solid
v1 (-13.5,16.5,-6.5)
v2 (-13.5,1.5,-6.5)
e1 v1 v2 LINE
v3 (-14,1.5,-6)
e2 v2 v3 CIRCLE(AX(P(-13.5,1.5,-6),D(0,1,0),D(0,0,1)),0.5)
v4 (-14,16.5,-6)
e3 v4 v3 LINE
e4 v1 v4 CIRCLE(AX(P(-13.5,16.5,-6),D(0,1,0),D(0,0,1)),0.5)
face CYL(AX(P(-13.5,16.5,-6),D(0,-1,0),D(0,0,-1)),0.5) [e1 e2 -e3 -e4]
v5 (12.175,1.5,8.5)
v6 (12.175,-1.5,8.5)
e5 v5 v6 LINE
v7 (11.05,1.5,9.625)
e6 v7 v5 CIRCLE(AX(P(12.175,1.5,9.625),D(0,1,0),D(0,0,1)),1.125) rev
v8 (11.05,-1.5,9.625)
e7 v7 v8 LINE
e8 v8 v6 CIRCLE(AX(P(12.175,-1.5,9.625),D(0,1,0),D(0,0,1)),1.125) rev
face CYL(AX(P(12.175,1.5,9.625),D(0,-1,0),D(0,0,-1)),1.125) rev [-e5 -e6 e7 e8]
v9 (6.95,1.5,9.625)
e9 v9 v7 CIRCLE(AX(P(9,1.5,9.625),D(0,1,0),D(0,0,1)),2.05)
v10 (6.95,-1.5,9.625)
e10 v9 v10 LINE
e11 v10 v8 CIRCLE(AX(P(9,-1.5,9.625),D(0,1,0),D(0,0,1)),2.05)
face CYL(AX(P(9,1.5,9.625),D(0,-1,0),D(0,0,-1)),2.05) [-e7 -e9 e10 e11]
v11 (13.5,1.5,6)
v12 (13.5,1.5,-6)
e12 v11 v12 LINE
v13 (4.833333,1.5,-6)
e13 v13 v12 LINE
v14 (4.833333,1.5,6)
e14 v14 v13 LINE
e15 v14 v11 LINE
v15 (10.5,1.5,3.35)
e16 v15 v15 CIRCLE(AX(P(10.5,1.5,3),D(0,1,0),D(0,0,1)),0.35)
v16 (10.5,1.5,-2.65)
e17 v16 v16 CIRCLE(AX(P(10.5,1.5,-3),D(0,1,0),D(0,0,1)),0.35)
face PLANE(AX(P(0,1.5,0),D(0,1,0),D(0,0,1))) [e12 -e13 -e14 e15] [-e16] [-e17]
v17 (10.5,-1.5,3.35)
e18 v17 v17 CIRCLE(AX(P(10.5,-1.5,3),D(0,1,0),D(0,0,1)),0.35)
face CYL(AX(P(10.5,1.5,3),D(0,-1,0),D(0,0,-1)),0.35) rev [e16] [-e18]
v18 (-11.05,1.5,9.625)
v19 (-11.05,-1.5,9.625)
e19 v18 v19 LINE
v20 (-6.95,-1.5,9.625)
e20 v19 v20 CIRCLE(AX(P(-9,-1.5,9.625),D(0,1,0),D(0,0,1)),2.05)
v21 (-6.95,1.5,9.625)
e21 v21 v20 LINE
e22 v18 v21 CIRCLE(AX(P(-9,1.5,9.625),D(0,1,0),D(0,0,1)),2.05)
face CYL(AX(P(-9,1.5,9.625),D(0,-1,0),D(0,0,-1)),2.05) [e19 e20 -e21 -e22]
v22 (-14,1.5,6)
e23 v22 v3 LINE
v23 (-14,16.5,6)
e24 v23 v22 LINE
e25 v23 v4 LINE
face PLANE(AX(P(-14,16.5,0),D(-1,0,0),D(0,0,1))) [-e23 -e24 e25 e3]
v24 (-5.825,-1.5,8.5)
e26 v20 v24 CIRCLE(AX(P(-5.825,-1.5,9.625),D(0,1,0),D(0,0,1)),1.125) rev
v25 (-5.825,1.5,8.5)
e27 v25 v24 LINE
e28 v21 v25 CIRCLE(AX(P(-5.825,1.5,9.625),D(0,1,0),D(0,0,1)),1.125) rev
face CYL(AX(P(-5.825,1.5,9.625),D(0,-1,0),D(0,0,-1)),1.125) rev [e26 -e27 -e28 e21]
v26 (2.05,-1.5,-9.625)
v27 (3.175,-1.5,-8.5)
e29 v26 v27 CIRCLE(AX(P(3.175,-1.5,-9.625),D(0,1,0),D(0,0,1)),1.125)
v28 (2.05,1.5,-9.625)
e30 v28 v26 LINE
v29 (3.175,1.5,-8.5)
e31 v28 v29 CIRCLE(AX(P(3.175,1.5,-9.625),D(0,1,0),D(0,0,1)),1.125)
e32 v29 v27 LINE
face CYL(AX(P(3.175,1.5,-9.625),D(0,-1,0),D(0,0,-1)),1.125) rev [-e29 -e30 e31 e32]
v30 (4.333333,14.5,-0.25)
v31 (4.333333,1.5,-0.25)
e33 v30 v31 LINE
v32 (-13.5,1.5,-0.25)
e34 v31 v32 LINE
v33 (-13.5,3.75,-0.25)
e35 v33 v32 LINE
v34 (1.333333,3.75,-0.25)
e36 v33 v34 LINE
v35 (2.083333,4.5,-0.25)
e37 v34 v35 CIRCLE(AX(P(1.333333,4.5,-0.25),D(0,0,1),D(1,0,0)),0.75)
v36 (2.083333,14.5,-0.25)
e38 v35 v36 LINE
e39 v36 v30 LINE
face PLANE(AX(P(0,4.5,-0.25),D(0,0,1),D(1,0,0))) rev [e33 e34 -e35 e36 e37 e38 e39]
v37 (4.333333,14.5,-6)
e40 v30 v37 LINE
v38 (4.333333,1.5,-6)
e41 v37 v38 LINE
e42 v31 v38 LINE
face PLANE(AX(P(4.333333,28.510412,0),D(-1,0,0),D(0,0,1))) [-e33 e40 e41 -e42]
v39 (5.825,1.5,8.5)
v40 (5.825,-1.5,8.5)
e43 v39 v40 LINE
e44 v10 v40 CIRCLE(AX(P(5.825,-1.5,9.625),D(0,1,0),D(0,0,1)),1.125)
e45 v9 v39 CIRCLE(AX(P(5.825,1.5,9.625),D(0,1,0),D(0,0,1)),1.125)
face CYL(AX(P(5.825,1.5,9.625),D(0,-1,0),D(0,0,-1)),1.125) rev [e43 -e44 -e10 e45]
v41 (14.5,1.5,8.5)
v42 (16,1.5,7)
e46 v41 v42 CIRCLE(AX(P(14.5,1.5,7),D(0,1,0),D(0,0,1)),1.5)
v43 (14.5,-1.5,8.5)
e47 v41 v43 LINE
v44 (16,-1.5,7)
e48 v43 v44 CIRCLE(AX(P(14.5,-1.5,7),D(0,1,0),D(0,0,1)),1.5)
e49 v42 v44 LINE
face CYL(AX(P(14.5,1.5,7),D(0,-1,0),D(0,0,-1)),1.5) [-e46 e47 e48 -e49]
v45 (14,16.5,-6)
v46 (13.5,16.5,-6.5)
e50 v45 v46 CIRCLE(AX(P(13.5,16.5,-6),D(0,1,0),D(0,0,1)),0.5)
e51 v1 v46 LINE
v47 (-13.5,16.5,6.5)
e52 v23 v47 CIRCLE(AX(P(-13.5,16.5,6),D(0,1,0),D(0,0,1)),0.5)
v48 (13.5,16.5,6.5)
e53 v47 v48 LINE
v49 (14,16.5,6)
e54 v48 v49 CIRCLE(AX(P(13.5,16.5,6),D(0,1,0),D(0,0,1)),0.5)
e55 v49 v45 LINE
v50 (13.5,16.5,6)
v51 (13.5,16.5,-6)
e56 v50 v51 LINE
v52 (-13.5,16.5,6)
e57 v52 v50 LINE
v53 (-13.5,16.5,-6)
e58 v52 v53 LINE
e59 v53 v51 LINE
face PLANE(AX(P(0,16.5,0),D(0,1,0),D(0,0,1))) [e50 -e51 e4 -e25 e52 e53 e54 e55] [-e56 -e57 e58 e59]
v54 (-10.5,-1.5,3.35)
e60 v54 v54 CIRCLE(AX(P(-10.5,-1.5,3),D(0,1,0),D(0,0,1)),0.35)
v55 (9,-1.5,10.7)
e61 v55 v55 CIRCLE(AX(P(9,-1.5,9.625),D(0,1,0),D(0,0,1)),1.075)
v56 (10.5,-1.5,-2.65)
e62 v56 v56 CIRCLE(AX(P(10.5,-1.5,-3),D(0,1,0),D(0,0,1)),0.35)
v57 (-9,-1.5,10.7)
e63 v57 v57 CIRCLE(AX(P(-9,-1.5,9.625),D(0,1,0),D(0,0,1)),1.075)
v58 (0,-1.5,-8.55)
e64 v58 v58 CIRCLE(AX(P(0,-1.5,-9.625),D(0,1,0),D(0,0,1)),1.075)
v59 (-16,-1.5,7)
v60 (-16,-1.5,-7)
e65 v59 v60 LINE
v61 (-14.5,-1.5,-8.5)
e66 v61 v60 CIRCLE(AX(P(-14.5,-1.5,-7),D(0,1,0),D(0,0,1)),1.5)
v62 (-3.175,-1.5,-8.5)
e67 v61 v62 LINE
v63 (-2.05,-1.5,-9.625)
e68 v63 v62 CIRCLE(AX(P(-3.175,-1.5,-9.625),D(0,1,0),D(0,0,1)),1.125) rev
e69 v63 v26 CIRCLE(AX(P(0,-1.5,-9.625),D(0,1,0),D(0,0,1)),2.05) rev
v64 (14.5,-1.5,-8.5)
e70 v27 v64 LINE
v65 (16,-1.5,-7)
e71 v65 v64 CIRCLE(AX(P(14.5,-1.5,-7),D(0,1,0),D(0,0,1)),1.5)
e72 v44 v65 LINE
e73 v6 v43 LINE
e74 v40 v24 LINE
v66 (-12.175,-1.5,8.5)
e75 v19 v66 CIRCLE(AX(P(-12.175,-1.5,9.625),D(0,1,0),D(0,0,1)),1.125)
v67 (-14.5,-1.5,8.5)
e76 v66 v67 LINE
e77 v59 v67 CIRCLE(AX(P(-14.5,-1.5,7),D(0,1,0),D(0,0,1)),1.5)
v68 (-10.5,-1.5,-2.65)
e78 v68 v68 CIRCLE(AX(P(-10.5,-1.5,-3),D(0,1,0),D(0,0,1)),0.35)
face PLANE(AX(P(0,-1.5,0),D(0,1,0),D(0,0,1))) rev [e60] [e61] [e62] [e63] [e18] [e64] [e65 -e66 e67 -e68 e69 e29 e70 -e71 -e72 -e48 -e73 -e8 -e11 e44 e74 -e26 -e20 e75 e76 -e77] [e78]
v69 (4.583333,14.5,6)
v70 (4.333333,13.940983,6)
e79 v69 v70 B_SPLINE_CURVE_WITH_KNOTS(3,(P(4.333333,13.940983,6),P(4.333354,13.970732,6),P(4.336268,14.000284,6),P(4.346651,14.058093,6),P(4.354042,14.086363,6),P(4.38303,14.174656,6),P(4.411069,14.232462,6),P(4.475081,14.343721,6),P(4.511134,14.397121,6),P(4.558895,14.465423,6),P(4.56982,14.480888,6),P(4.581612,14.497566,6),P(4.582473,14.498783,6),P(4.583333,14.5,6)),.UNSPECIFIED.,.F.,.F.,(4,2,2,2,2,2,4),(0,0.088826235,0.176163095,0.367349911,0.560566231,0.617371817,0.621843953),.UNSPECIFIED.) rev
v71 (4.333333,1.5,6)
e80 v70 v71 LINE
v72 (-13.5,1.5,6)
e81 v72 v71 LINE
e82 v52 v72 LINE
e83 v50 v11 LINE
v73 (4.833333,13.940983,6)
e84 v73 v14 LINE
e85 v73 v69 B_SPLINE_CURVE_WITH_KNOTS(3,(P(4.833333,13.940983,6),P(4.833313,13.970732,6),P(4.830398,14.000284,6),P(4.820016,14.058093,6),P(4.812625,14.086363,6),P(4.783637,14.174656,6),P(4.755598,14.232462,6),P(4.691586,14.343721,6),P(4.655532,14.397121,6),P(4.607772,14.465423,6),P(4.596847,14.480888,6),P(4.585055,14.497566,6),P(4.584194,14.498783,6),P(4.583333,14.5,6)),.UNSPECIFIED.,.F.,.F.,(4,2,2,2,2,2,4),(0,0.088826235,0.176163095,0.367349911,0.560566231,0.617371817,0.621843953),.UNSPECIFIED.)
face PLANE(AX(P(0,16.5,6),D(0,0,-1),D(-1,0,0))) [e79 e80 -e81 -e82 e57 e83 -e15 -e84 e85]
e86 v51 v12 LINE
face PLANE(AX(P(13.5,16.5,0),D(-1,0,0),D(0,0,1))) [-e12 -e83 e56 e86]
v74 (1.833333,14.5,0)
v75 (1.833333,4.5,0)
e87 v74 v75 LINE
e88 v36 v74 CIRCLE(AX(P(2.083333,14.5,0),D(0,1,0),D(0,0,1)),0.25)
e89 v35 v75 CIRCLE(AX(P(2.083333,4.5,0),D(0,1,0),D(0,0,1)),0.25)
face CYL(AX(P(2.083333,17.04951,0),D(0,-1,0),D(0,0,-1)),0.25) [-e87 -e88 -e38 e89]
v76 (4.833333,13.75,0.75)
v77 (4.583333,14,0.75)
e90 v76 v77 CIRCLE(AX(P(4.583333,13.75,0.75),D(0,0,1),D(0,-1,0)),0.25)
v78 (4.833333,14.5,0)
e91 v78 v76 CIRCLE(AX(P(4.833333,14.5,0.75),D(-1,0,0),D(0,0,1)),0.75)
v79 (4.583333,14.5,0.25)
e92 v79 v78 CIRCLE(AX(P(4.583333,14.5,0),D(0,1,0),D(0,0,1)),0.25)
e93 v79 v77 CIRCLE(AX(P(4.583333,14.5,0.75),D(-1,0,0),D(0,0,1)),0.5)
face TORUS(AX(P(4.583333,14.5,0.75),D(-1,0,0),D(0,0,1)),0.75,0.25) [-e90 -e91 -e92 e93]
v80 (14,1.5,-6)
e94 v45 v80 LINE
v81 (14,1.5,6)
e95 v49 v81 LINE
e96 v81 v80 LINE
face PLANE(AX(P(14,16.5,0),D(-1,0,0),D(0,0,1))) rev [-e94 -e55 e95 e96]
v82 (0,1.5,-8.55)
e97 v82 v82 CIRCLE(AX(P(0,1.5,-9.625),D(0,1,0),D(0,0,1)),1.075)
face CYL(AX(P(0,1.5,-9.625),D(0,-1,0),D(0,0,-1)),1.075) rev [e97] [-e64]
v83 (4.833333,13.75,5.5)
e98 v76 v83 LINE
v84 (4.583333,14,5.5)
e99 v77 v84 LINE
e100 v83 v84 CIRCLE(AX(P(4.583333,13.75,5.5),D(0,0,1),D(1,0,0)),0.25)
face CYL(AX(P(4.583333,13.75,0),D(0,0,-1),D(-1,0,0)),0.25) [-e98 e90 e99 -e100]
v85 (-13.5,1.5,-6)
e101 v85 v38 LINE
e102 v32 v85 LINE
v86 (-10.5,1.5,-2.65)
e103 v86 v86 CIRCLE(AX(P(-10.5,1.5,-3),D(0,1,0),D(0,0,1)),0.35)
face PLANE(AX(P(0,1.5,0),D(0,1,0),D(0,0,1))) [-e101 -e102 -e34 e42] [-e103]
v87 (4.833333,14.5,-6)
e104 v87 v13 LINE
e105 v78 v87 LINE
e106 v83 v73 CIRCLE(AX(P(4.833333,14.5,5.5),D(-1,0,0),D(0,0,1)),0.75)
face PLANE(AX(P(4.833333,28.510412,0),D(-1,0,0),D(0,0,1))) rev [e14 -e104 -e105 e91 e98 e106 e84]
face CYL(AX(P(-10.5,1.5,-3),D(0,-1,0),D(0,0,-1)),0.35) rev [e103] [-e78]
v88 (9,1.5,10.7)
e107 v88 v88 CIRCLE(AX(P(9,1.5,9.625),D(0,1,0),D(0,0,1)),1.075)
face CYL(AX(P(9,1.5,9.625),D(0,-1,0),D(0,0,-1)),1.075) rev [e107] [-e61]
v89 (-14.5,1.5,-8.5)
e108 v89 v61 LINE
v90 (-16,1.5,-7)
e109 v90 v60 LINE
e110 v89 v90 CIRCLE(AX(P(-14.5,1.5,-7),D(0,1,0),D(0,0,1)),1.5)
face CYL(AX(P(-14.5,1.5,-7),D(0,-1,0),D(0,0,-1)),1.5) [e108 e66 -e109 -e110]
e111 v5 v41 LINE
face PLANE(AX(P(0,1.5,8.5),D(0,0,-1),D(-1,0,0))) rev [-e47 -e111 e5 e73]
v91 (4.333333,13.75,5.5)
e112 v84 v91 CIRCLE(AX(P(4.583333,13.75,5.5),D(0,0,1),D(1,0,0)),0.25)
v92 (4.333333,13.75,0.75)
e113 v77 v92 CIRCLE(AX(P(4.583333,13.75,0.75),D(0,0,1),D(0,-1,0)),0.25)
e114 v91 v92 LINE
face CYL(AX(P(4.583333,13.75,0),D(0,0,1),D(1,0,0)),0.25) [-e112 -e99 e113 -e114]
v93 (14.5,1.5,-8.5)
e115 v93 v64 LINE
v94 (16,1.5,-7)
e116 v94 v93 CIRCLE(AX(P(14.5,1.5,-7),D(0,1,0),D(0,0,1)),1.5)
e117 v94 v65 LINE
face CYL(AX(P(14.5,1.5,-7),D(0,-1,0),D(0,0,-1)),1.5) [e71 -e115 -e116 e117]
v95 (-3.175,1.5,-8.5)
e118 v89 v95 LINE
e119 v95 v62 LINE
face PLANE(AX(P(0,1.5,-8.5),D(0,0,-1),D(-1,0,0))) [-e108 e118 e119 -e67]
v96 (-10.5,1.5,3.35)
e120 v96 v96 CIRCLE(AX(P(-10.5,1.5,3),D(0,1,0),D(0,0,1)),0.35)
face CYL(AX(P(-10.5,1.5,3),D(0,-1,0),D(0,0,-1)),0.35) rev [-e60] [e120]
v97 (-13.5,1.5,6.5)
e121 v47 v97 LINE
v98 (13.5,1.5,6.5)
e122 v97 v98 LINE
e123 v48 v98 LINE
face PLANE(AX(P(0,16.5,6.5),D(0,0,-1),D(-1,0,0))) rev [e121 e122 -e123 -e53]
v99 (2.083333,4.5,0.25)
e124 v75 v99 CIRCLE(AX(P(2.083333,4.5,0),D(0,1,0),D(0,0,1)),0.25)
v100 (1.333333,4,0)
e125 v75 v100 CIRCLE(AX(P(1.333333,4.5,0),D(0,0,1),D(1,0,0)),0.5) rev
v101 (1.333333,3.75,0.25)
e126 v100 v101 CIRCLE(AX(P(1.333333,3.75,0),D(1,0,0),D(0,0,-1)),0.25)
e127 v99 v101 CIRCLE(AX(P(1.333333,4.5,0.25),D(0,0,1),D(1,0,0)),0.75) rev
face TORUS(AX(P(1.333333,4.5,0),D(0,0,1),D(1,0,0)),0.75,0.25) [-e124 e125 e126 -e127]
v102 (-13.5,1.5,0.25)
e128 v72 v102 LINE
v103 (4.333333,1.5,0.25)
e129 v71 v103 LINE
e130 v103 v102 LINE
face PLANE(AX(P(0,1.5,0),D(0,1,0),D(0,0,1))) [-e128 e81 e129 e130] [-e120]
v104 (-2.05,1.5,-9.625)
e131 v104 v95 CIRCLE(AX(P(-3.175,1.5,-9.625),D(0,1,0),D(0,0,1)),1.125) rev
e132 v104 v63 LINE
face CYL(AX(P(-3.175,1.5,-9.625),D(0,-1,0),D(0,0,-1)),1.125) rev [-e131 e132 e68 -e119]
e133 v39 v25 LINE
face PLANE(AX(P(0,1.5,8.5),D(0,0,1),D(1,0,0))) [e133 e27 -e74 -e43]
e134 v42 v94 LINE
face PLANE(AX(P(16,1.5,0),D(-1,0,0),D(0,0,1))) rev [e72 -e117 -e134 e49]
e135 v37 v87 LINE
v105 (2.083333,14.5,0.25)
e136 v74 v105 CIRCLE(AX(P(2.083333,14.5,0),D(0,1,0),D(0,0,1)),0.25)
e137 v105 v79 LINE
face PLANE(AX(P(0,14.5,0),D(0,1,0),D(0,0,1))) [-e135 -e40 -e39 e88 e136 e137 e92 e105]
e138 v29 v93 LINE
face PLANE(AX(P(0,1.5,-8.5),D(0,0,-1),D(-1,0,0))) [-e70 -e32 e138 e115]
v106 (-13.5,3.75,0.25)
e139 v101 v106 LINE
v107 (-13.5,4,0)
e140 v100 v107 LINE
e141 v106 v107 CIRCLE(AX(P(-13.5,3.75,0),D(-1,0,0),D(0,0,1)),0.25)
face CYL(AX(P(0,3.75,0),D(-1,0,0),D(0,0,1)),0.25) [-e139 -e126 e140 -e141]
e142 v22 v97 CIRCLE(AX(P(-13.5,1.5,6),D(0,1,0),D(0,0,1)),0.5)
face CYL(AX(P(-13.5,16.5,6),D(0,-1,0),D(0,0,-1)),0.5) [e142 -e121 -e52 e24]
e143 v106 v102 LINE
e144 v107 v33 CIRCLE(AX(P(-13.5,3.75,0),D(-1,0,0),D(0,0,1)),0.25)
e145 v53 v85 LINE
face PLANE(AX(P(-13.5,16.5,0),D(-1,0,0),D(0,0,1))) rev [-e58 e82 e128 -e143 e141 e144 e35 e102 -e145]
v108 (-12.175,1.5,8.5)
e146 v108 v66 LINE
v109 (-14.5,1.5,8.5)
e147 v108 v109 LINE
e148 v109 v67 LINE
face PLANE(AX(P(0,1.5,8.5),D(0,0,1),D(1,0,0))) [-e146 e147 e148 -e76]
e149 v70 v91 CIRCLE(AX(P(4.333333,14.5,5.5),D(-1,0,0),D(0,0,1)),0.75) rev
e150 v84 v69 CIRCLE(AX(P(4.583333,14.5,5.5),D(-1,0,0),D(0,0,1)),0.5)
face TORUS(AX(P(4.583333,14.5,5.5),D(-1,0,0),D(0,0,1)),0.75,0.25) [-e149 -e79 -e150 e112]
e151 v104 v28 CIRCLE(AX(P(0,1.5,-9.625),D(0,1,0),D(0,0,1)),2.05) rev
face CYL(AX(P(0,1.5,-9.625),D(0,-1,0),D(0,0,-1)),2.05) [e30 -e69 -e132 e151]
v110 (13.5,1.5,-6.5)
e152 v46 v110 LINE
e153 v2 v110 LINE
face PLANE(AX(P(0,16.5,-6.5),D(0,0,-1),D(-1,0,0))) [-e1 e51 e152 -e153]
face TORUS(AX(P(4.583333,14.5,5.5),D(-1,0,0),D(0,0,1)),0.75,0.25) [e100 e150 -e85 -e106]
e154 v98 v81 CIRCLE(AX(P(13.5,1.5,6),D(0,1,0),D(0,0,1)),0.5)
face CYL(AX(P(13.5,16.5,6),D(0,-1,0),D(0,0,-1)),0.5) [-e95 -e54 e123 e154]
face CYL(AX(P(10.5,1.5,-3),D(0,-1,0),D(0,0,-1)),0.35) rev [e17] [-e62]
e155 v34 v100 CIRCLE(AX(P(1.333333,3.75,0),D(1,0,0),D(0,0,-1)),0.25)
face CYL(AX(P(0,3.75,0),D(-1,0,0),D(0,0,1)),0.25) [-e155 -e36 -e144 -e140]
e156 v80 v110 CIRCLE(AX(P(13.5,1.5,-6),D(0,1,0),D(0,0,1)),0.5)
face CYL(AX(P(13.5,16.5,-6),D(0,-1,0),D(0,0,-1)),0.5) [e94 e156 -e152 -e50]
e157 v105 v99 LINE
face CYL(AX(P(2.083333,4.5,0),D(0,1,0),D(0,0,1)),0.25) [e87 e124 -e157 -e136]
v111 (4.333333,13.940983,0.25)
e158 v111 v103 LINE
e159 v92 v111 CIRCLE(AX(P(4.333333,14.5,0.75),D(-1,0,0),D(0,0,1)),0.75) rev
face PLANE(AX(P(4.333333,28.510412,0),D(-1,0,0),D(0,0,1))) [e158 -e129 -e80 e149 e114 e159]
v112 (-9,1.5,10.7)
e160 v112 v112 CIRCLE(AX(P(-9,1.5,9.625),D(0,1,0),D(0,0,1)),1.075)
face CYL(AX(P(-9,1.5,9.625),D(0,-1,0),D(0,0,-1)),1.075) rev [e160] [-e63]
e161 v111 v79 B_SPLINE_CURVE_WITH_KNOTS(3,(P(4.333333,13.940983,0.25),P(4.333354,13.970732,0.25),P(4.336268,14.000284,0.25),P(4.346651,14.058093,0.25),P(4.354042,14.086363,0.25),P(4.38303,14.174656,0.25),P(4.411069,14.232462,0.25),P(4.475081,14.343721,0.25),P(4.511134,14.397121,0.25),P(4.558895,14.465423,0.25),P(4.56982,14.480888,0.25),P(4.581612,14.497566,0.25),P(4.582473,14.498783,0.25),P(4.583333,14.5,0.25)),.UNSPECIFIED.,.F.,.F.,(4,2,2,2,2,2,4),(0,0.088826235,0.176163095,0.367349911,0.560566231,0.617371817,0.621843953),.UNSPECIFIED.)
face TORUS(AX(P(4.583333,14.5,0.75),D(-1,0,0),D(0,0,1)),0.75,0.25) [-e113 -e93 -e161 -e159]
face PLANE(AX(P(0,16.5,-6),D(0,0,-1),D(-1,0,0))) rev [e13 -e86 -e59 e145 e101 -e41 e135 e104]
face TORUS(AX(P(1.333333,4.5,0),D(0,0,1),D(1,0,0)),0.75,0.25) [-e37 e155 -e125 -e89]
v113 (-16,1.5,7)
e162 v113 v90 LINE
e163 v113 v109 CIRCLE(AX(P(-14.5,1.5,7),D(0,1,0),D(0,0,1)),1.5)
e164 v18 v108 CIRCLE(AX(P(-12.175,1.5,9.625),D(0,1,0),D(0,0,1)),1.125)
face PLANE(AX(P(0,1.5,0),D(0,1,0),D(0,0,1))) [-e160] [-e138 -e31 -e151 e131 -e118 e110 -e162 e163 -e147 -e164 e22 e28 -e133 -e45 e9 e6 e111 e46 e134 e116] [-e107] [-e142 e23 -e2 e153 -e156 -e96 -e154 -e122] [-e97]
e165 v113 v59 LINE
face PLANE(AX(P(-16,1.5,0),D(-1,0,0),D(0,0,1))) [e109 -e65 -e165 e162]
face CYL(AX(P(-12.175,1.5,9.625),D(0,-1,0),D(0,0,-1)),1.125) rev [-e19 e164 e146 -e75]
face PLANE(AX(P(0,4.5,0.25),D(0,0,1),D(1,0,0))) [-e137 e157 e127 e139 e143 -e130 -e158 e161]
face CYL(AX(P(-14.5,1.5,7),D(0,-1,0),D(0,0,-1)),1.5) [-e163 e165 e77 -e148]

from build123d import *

# Parameters (mm, degrees)
BASE_PLATE_AND_PORTS_2_R   = 0.34999999999999903
BASE_PLATE_AND_PORTS_2_R_2 = 1.0749999999999997
BASE_PLATE_AND_PORTS_2_R_3 = 1.0749999999999986
BASE_PLATE_AND_PORTS_DEPTH = 1.5
BOSS_EXTRUDE1_DEPTH        = 15
RESERVOIRS_4_W             = 0.5000000000000018
RESERVOIRS_4_H             = 12.000000000000004
BOSS_EXTRUDE5_DEPTH        = 13
BOSS_EXTRUDE3_START        = 1.5
SKETCH3_W                  = 15.333333333333329
SKETCH3_H                  = 0.5
BOSS_EXTRUDE3_DEPTH        = 3
CUT_EXTRUDE1_REACH         = 27.893
BOSS_EXTRUDE6_DEPTH        = 14.5
CUT_EXTRUDE2_DEPTH         = 0.5
FILLET2_R                  = 0.25


with BuildPart() as part:
    # Base-plate and ports 2 → Base plate and ports (new, symmetric)
    with BuildSketch(Plane(origin=(0, 0, 0), x_dir=(1, 0, 0), z_dir=(0, 1, 0))):
        with BuildLine():
            Line((-15.999999999999996, -6.999999999999999), (-15.999999999999996, 6.999999999999999))
            ThreePointArc((-15.999999999999996, 6.999999999999999), (-15.56066017177982, 8.060660171779821), (-14.499999999999996, 8.5))
            Line((-14.499999999999996, 8.5), (-3.1749999999999976, 8.5))
            ThreePointArc((-3.1749999999999976, 8.5), (-2.379504871165132, 8.829504871165135), (-2.049999999999998, 9.625000000000002))
            ThreePointArc((-2.049999999999998, 9.625000000000002), (1.86e-15, 11.675), (2.0500000000000016, 9.625000000000002))
            ThreePointArc((2.0500000000000016, 9.625000000000002), (2.379504871165136, 8.829504871165135), (3.1750000000000025, 8.5))
            Line((3.1750000000000025, 8.5), (14.499999999999996, 8.5))
            ThreePointArc((14.499999999999996, 8.5), (15.560660171779821, 8.060660171779823), (16, 6.999999999999999))
            Line((16, 6.999999999999999), (15.999999999999996, -6.999999999999999))
            ThreePointArc((15.999999999999996, -6.999999999999999), (15.56066017177982, -8.060660171779821), (14.499999999999996, -8.5))
            Line((14.499999999999996, -8.5), (12.175, -8.5))
            ThreePointArc((12.175, -8.5), (11.379504871165134, -8.829504871165135), (11.049999999999999, -9.625000000000002))
            ThreePointArc((11.049999999999999, -9.625000000000002), (9, -11.675000000000002), (6.949999999999999, -9.625000000000002))
            ThreePointArc((6.949999999999999, -9.625000000000002), (6.620495128834865, -8.829504871165135), (5.8249999999999975, -8.5))
            Line((5.8249999999999975, -8.5), (-5.8249999999999975, -8.5))
            ThreePointArc((-5.8249999999999975, -8.5), (-6.620495128834865, -8.829504871165135), (-6.949999999999999, -9.625000000000002))
            ThreePointArc((-6.949999999999999, -9.625000000000002), (-9, -11.675), (-11.049999999999999, -9.625000000000002))
            ThreePointArc((-11.049999999999999, -9.625000000000002), (-11.379504871165134, -8.829504871165135), (-12.175, -8.5))
            Line((-12.175, -8.5), (-14.499999999999996, -8.5))
            ThreePointArc((-14.499999999999996, -8.5), (-15.560660171779817, -8.060660171779821), (-15.999999999999996, -6.999999999999999))
        make_face()
        with Locations(Location((-10.499999999999995, 2.999999999999999, 0), (0, 0, 270))):
            Circle(BASE_PLATE_AND_PORTS_2_R, mode=Mode.SUBTRACT)
        with Locations(Location((10.500000000000005, 2.999999999999999, 0), (0, 0, 270))):
            Circle(BASE_PLATE_AND_PORTS_2_R, mode=Mode.SUBTRACT)
        with Locations(Location((10.500000000000005, -3.000000000000001, 0), (0, 0, 270))):
            Circle(BASE_PLATE_AND_PORTS_2_R, mode=Mode.SUBTRACT)
        with Locations(Location((-10.499999999999995, -3.000000000000001, 0), (0, 0, 270))):
            Circle(BASE_PLATE_AND_PORTS_2_R, mode=Mode.SUBTRACT)
        with Locations(Location((1.73e-15, 9.625000000000002, 0), (0, 0, 270))):
            Circle(BASE_PLATE_AND_PORTS_2_R_2, mode=Mode.SUBTRACT)
        with Locations(Location((-9, -9.625000000000002, 0), (0, 0, 270))):
            Circle(BASE_PLATE_AND_PORTS_2_R_3, mode=Mode.SUBTRACT)
        with Locations(Location((9, -9.625000000000002, 0), (0, 0, 270))):
            Circle(BASE_PLATE_AND_PORTS_2_R_3, mode=Mode.SUBTRACT)
    extrude(amount=BASE_PLATE_AND_PORTS_DEPTH, both=True)

    # Reservoirs → Boss-Extrude1 (add)
    with BuildSketch(Plane(origin=(0, 1.5, 0), x_dir=(1, 0, 0), z_dir=(0, 1, 0))):
        with BuildLine():
            ThreePointArc((-13.999999999999998, -5.999999999999997), (-13.853553390593273, -6.353553390593276), (-13.499999999999995, -6.500000000000002))
            Line((-13.499999999999995, -6.500000000000002), (13.499999999999995, -6.500000000000002))
            ThreePointArc((13.499999999999995, -6.500000000000002), (13.853553390593273, -6.353553390593276), (13.999999999999998, -5.999999999999997))
            Line((13.999999999999998, -5.999999999999997), (13.999999999999998, 5.999999999999999))
            ThreePointArc((13.999999999999998, 5.999999999999998), (13.853553390593271, 6.353553390593275), (13.499999999999995, 6.500000000000001))
            Line((13.499999999999995, 6.500000000000002), (-13.499999999999995, 6.500000000000002))
            ThreePointArc((-13.499999999999995, 6.500000000000001), (-13.853553390593271, 6.353553390593275), (-13.999999999999998, 5.999999999999998))
            Line((-13.999999999999998, 5.999999999999999), (-13.999999999999998, -5.999999999999997))
        make_face()
        Polygon((4.333333333333331, -6.000000000000002), (-4.333333333333333, -6.000000000000002), (-4.833333333333332, -6.000000000000002), (-13.499999999999996, -6.000000000000002), (-13.499999999999996, 6.000000000000002), (-4.833333333333332, 6.000000000000002), (-4.333333333333333, 6.000000000000002), (4.333333333333331, 6.000000000000002), (4.833333333333334, 6.000000000000002), (13.499999999999998, 6.000000000000002), (13.499999999999998, -6.000000000000002), (4.833333333333334, -6.000000000000002), align=None, mode=Mode.SUBTRACT)
    extrude(amount=BOSS_EXTRUDE1_DEPTH)

    # Reservoirs<4> → Boss-Extrude5 (add)
    with BuildSketch(Plane(origin=(0, 1.5, 0), x_dir=(1, 0, 0), z_dir=(0, 1, 0))):
        with Locations((4.583333333333333, 0)):
            Rectangle(RESERVOIRS_4_W, RESERVOIRS_4_H)
    extrude(amount=BOSS_EXTRUDE5_DEPTH)

    # Sketch3 → Boss-Extrude3 (add)
    with BuildSketch(Plane(origin=(0, 0, 0), x_dir=(1, 0, 0), z_dir=(0, 1, 0)).offset(BOSS_EXTRUDE3_START)):
        with Locations((-5.833333333333332, 0)):
            Rectangle(SKETCH3_W, SKETCH3_H)
        Polygon((4.333333333333332, 0.25), (1.8333333333333321, 0.25), (1.8333333333333326, -0.25), (4.333333333333332, -0.25), align=None)
    extrude(amount=BOSS_EXTRUDE3_DEPTH)

    # Sketch4 → Cut-Extrude1 (cut, up to next)
    with BuildSketch(Plane.XY.offset(0.25), mode=Mode.PRIVATE) as cut_extrude1_sk1:
        with BuildLine():
            Line((-13.499999999999995, 4), (1.3333333333333304, 4))
            ThreePointArc((1.3333333333333304, 3.9999999999999996), (1.8333333333333313, 4.5), (1.3333333333333304, 5.000000000000001))
            Line((1.3333333333333304, 5.000000000000001), (-13.499999999999995, 5.000000000000001))
            Line((-13.499999999999995, 5.000000000000001), (-13.499999999999995, 4))
        make_face()
    cut_extrude1_tool1 = extrude(cut_extrude1_sk1.sketch, amount=-CUT_EXTRUDE1_REACH, mode=Mode.PRIVATE) & part.part
    add(cut_extrude1_tool1.solids().sort_by_distance((-5.886575, 4.5, 0.25))[0], mode=Mode.SUBTRACT)

    # Sketch3<4> → Boss-Extrude6 (add)
    with BuildSketch(Plane(origin=(0, 0, 0), x_dir=(1, 0, 0), z_dir=(0, 1, 0))):
        Polygon((4.333333333333332, 0.25), (1.8333333333333321, 0.25), (1.8333333333333326, -0.25), (4.333333333333332, -0.25), align=None)
    extrude(amount=BOSS_EXTRUDE6_DEPTH)

    # Sketch5 → Cut-Extrude2 (cut)
    with BuildSketch(Plane(origin=(4.833333333333334, 0, 0), x_dir=(0, 0, -1), z_dir=(1, 0, 0))):
        with BuildLine():
            Line((-0.25, 14.5), (-6.000000000000002, 14.5))
            ThreePointArc((-6.000000000000001, 14.5), (-5.853553390593275, 14.146446609406727), (-5.500000000000002, 14))
            Line((-5.500000000000002, 14.000000000000002), (-0.75, 14.000000000000002))
            ThreePointArc((-0.7500000000000004, 14), (-0.39644660940672805, 14.146446609406727), (-0.2500000000000025, 14.5))
        make_face()
        with BuildLine():
            Line((-0.75, 15), (-5.500000000000002, 15))
            ThreePointArc((-5.500000000000002, 15), (-5.853553390593275, 14.853553390593273), (-6.000000000000001, 14.5))
            Line((-6.000000000000002, 14.5), (-0.25, 14.5))
            ThreePointArc((-0.2500000000000025, 14.5), (-0.396446609406728, 14.853553390593273), (-0.7500000000000003, 15))
        make_face()
        with BuildLine():
            ThreePointArc((-6.000000000000001, 14.5), (-5.853553390593275, 14.853553390593273), (-5.500000000000002, 15))
            Line((-5.500000000000002, 15), (-0.75, 15))
            ThreePointArc((-0.7500000000000003, 15), (-0.396446609406728, 14.853553390593273), (-0.2500000000000025, 14.5))
            Line((-0.25, 14.5), (-0.2500000000000011, 16.5))
            Line((-0.2500000000000009, 16.5), (-6.000000000000002, 16.5))
            Line((-6.000000000000002, 16.5), (-6.000000000000002, 14.5))
        make_face()
    extrude(amount=-CUT_EXTRUDE2_DEPTH, mode=Mode.SUBTRACT)

    # Fillet2
    # the kernel refuses this fillet: 0.25 mm, written as the material it takes off along each edge
    with BuildSketch(Plane(origin=(4.833333333333334, 14.500000000000002, 5.5), x_dir=(0, -1, 3.55e-15), z_dir=(0, -3.55e-15, -1))) as fillet2_piece_1_section:
        with BuildLine():
            CenterArc((0.5000000000000018 + FILLET2_R, FILLET2_R), FILLET2_R, 180, 90)
            Line((0.5000000000000018, FILLET2_R), (0.5000000000000018, 0))
            Line((0.5000000000000018, 0), (0.5000000000000018 + FILLET2_R, 0))
        make_face()
    fillet2_piece_1 = revolve(axis=Axis((4.833333333333334, 14.500000000000002, 5.5), (-1, 0, 0)), revolution_arc=161.64849461869665, mode=Mode.PRIVATE)
    fillet2_piece_1 = split(fillet2_piece_1, bisect_by=Plane(origin=(4.792673642292299, 13.946974301999488, 6.000000000000002), z_dir=(0, 0, -1)), keep=Keep.TOP, mode=Mode.PRIVATE)
    add(fillet2_piece_1, mode=Mode.SUBTRACT)
    with BuildSketch(Plane(origin=(4.833333333333334, 14.5, 0.7500000000000024), x_dir=(0, -1, -4.44e-15), z_dir=(0, -4.44e-15, 1))) as fillet2_piece_2:
        with BuildLine():
            CenterArc((0.5 + FILLET2_R, -FILLET2_R), FILLET2_R, 90, 90)
            Line((0.5, -FILLET2_R), (0.5, 0))
            Line((0.5, 0), (0.5 + FILLET2_R, 0))
        make_face()
    revolve(axis=Axis((4.833333333333334, 14.5, 0.7500000000000024), (1, 0, 0)), revolution_arc=161.64849461869707, mode=Mode.SUBTRACT)
    with BuildSketch(Plane(origin=(4.333333333333334, 14.499999999999998, 5.5), x_dir=(0, 0.9491428341660831, 0.31484580408697754), z_dir=(0, 0.31484580408697754, -0.9491428341660831))) as fillet2_piece_3_section:
        with BuildLine():
            CenterArc((0.5000000000000034 + FILLET2_R, FILLET2_R), FILLET2_R, 180, 90)
            Line((0.5000000000000034, FILLET2_R), (0.5000000000000034, -1.78e-15))
            Line((0.5000000000000034, -1.78e-15), (0.5000000000000034 + FILLET2_R, -1.78e-15))
        make_face()
    fillet2_piece_3 = revolve(axis=Axis((4.333333333333334, 14.499999999999998, 5.5), (1, 0, 0)), revolution_arc=161.64849461869707, mode=Mode.PRIVATE)
    fillet2_piece_3 = split(fillet2_piece_3, bisect_by=Plane(origin=(4.401371141289412, 14.134450790622495, 6.000000000000002), z_dir=(0, 0, -1)), keep=Keep.TOP, mode=Mode.PRIVATE)
    add(fillet2_piece_3, mode=Mode.SUBTRACT)
    with BuildSketch(Plane(origin=(4.333333333333334, 14.5, 0.7500000000000024), x_dir=(0, 0.9491428341660829, -0.31484580408697815), z_dir=(0, 0.31484580408697815, 0.9491428341660829))) as fillet2_piece_4_section:
        with BuildLine():
            CenterArc((0.4999999999999997 + FILLET2_R, -FILLET2_R), FILLET2_R, 90, 90)
            Line((0.4999999999999998, -FILLET2_R), (0.4999999999999997, 1.78e-15))
            Line((0.4999999999999997, 1.78e-15), (0.4999999999999997 + FILLET2_R, 1.78e-15))
        make_face()
    fillet2_piece_4 = revolve(axis=Axis((4.333333333333334, 14.5, 0.7500000000000024), (-1, 0, 0)), revolution_arc=161.64849461869707, mode=Mode.PRIVATE)
    fillet2_piece_4 = split(fillet2_piece_4, bisect_by=Plane(origin=(4.401371052890266, 14.134450871255241, 0.25), z_dir=(0, 0, 1)), keep=Keep.TOP, mode=Mode.PRIVATE)
    add(fillet2_piece_4, mode=Mode.SUBTRACT)
    with BuildSketch(Plane(origin=(4.833333333333334, 14.000000000000002, 5.500000000000002), x_dir=(0, -1, 0), z_dir=(0, 0, -1))) as fillet2_piece_5:
        with BuildLine():
            CenterArc((FILLET2_R, FILLET2_R), FILLET2_R, 180, 90)
            Line((0, FILLET2_R), (0, 0))
            Line((0, 0), (FILLET2_R, 0))
        make_face()
    extrude(amount=4.750000000000002, mode=Mode.SUBTRACT)
    with BuildSketch(Plane(origin=(4.333333333333334, 14.000000000000002, 5.500000000000002), x_dir=(-7.11e-15, -1, 0), z_dir=(0, 0, -1))) as fillet2_piece_6:
        with BuildLine():
            CenterArc((FILLET2_R, -FILLET2_R), FILLET2_R, 89.99999999999959, 90.00000000000041)
            Line((-1.78e-15, -FILLET2_R), (0, 0))
            Line((0, 0), (FILLET2_R, 0))
        make_face()
    extrude(amount=4.750000000000002, mode=Mode.SUBTRACT)
    with BuildSketch(Plane(origin=(1.8333333333333324, 4.4999999999999805, 0.25), x_dir=(1, 0, 0), z_dir=(0, 1, 0))) as fillet2_piece_7:
        with BuildLine():
            CenterArc((FILLET2_R, FILLET2_R), FILLET2_R, 180, 90)
            Line((-2.2e-16, FILLET2_R), (0, 0))
            Line((0, 0), (FILLET2_R, 0))
        make_face()
    extrude(amount=10.625000000000018, mode=Mode.SUBTRACT)
    with BuildSketch(Plane(origin=(1.3333333333333308, 4.5, 0.25), x_dir=(-8.9e-16, -1, 0), z_dir=(-1, 8.9e-16, 0))) as fillet2_piece_8:
        with BuildLine():
            CenterArc((0.5000000000000004 + FILLET2_R, -FILLET2_R), FILLET2_R, 90, 90)
            Line((0.5000000000000004, -FILLET2_R), (0.5000000000000004, 0))
            Line((0.5000000000000004, 0), (0.5000000000000004 + FILLET2_R, 0))
        make_face()
    revolve(axis=Axis((1.3333333333333308, 4.5, 0.25), (0, 0, 1)), revolution_arc=89.99999999999781, mode=Mode.SUBTRACT)
    with BuildSketch(Plane(origin=(1.8333333333333324, 4.5, -0.25), x_dir=(8.9e-16, 0, 1), z_dir=(0, 1, 0))) as fillet2_piece_9:
        with BuildLine():
            CenterArc((FILLET2_R, FILLET2_R), FILLET2_R, 180.00000000000006, 89.99999999999989)
            Line((2.2e-16, FILLET2_R), (0, 0))
            Line((0, 0), (FILLET2_R, 0))
        make_face()
    extrude(amount=10.625, mode=Mode.SUBTRACT)
    with BuildSketch(Plane(origin=(1.3333333333333308, 4.5, -0.25), x_dir=(-8.9e-16, -1, 0), z_dir=(-1, 8.9e-16, 0))) as fillet2_piece_10:
        with BuildLine():
            CenterArc((0.5000000000000004 + FILLET2_R, FILLET2_R), FILLET2_R, 180, 90)
            Line((0.5000000000000004 + FILLET2_R, 0), (0.5000000000000004, 0))
            Line((0.5000000000000004, 0), (0.5000000000000004, FILLET2_R))
        make_face()
    revolve(axis=Axis((1.3333333333333308, 4.5, -0.25), (0, 0, 1)), revolution_arc=90.00000000000006, mode=Mode.SUBTRACT)
    with BuildSketch(Plane(origin=(-13.499999999999995, 4, 0.25), x_dir=(0, -1, 0), z_dir=(1, 0, 0))) as fillet2_piece_11:
        with BuildLine():
            CenterArc((FILLET2_R, FILLET2_R), FILLET2_R, 180, 90)
            Line((0, FILLET2_R), (0, 0))
            Line((0, 0), (FILLET2_R, 0))
        make_face()
    extrude(amount=14.833333333333325, mode=Mode.SUBTRACT)
    with BuildSketch(Plane(origin=(1.3333333333333304, 4, -0.25), x_dir=(0, 0, 1), z_dir=(-1, 0, 0))) as fillet2_piece_12:
        with BuildLine():
            CenterArc((FILLET2_R, -FILLET2_R), FILLET2_R, 90, 90)
            Line((0, -FILLET2_R), (0, 0))
            Line((0, 0), (FILLET2_R, 0))
        make_face()
    extrude(amount=14.833333333333325, mode=Mode.SUBTRACT)


solid = part.part
